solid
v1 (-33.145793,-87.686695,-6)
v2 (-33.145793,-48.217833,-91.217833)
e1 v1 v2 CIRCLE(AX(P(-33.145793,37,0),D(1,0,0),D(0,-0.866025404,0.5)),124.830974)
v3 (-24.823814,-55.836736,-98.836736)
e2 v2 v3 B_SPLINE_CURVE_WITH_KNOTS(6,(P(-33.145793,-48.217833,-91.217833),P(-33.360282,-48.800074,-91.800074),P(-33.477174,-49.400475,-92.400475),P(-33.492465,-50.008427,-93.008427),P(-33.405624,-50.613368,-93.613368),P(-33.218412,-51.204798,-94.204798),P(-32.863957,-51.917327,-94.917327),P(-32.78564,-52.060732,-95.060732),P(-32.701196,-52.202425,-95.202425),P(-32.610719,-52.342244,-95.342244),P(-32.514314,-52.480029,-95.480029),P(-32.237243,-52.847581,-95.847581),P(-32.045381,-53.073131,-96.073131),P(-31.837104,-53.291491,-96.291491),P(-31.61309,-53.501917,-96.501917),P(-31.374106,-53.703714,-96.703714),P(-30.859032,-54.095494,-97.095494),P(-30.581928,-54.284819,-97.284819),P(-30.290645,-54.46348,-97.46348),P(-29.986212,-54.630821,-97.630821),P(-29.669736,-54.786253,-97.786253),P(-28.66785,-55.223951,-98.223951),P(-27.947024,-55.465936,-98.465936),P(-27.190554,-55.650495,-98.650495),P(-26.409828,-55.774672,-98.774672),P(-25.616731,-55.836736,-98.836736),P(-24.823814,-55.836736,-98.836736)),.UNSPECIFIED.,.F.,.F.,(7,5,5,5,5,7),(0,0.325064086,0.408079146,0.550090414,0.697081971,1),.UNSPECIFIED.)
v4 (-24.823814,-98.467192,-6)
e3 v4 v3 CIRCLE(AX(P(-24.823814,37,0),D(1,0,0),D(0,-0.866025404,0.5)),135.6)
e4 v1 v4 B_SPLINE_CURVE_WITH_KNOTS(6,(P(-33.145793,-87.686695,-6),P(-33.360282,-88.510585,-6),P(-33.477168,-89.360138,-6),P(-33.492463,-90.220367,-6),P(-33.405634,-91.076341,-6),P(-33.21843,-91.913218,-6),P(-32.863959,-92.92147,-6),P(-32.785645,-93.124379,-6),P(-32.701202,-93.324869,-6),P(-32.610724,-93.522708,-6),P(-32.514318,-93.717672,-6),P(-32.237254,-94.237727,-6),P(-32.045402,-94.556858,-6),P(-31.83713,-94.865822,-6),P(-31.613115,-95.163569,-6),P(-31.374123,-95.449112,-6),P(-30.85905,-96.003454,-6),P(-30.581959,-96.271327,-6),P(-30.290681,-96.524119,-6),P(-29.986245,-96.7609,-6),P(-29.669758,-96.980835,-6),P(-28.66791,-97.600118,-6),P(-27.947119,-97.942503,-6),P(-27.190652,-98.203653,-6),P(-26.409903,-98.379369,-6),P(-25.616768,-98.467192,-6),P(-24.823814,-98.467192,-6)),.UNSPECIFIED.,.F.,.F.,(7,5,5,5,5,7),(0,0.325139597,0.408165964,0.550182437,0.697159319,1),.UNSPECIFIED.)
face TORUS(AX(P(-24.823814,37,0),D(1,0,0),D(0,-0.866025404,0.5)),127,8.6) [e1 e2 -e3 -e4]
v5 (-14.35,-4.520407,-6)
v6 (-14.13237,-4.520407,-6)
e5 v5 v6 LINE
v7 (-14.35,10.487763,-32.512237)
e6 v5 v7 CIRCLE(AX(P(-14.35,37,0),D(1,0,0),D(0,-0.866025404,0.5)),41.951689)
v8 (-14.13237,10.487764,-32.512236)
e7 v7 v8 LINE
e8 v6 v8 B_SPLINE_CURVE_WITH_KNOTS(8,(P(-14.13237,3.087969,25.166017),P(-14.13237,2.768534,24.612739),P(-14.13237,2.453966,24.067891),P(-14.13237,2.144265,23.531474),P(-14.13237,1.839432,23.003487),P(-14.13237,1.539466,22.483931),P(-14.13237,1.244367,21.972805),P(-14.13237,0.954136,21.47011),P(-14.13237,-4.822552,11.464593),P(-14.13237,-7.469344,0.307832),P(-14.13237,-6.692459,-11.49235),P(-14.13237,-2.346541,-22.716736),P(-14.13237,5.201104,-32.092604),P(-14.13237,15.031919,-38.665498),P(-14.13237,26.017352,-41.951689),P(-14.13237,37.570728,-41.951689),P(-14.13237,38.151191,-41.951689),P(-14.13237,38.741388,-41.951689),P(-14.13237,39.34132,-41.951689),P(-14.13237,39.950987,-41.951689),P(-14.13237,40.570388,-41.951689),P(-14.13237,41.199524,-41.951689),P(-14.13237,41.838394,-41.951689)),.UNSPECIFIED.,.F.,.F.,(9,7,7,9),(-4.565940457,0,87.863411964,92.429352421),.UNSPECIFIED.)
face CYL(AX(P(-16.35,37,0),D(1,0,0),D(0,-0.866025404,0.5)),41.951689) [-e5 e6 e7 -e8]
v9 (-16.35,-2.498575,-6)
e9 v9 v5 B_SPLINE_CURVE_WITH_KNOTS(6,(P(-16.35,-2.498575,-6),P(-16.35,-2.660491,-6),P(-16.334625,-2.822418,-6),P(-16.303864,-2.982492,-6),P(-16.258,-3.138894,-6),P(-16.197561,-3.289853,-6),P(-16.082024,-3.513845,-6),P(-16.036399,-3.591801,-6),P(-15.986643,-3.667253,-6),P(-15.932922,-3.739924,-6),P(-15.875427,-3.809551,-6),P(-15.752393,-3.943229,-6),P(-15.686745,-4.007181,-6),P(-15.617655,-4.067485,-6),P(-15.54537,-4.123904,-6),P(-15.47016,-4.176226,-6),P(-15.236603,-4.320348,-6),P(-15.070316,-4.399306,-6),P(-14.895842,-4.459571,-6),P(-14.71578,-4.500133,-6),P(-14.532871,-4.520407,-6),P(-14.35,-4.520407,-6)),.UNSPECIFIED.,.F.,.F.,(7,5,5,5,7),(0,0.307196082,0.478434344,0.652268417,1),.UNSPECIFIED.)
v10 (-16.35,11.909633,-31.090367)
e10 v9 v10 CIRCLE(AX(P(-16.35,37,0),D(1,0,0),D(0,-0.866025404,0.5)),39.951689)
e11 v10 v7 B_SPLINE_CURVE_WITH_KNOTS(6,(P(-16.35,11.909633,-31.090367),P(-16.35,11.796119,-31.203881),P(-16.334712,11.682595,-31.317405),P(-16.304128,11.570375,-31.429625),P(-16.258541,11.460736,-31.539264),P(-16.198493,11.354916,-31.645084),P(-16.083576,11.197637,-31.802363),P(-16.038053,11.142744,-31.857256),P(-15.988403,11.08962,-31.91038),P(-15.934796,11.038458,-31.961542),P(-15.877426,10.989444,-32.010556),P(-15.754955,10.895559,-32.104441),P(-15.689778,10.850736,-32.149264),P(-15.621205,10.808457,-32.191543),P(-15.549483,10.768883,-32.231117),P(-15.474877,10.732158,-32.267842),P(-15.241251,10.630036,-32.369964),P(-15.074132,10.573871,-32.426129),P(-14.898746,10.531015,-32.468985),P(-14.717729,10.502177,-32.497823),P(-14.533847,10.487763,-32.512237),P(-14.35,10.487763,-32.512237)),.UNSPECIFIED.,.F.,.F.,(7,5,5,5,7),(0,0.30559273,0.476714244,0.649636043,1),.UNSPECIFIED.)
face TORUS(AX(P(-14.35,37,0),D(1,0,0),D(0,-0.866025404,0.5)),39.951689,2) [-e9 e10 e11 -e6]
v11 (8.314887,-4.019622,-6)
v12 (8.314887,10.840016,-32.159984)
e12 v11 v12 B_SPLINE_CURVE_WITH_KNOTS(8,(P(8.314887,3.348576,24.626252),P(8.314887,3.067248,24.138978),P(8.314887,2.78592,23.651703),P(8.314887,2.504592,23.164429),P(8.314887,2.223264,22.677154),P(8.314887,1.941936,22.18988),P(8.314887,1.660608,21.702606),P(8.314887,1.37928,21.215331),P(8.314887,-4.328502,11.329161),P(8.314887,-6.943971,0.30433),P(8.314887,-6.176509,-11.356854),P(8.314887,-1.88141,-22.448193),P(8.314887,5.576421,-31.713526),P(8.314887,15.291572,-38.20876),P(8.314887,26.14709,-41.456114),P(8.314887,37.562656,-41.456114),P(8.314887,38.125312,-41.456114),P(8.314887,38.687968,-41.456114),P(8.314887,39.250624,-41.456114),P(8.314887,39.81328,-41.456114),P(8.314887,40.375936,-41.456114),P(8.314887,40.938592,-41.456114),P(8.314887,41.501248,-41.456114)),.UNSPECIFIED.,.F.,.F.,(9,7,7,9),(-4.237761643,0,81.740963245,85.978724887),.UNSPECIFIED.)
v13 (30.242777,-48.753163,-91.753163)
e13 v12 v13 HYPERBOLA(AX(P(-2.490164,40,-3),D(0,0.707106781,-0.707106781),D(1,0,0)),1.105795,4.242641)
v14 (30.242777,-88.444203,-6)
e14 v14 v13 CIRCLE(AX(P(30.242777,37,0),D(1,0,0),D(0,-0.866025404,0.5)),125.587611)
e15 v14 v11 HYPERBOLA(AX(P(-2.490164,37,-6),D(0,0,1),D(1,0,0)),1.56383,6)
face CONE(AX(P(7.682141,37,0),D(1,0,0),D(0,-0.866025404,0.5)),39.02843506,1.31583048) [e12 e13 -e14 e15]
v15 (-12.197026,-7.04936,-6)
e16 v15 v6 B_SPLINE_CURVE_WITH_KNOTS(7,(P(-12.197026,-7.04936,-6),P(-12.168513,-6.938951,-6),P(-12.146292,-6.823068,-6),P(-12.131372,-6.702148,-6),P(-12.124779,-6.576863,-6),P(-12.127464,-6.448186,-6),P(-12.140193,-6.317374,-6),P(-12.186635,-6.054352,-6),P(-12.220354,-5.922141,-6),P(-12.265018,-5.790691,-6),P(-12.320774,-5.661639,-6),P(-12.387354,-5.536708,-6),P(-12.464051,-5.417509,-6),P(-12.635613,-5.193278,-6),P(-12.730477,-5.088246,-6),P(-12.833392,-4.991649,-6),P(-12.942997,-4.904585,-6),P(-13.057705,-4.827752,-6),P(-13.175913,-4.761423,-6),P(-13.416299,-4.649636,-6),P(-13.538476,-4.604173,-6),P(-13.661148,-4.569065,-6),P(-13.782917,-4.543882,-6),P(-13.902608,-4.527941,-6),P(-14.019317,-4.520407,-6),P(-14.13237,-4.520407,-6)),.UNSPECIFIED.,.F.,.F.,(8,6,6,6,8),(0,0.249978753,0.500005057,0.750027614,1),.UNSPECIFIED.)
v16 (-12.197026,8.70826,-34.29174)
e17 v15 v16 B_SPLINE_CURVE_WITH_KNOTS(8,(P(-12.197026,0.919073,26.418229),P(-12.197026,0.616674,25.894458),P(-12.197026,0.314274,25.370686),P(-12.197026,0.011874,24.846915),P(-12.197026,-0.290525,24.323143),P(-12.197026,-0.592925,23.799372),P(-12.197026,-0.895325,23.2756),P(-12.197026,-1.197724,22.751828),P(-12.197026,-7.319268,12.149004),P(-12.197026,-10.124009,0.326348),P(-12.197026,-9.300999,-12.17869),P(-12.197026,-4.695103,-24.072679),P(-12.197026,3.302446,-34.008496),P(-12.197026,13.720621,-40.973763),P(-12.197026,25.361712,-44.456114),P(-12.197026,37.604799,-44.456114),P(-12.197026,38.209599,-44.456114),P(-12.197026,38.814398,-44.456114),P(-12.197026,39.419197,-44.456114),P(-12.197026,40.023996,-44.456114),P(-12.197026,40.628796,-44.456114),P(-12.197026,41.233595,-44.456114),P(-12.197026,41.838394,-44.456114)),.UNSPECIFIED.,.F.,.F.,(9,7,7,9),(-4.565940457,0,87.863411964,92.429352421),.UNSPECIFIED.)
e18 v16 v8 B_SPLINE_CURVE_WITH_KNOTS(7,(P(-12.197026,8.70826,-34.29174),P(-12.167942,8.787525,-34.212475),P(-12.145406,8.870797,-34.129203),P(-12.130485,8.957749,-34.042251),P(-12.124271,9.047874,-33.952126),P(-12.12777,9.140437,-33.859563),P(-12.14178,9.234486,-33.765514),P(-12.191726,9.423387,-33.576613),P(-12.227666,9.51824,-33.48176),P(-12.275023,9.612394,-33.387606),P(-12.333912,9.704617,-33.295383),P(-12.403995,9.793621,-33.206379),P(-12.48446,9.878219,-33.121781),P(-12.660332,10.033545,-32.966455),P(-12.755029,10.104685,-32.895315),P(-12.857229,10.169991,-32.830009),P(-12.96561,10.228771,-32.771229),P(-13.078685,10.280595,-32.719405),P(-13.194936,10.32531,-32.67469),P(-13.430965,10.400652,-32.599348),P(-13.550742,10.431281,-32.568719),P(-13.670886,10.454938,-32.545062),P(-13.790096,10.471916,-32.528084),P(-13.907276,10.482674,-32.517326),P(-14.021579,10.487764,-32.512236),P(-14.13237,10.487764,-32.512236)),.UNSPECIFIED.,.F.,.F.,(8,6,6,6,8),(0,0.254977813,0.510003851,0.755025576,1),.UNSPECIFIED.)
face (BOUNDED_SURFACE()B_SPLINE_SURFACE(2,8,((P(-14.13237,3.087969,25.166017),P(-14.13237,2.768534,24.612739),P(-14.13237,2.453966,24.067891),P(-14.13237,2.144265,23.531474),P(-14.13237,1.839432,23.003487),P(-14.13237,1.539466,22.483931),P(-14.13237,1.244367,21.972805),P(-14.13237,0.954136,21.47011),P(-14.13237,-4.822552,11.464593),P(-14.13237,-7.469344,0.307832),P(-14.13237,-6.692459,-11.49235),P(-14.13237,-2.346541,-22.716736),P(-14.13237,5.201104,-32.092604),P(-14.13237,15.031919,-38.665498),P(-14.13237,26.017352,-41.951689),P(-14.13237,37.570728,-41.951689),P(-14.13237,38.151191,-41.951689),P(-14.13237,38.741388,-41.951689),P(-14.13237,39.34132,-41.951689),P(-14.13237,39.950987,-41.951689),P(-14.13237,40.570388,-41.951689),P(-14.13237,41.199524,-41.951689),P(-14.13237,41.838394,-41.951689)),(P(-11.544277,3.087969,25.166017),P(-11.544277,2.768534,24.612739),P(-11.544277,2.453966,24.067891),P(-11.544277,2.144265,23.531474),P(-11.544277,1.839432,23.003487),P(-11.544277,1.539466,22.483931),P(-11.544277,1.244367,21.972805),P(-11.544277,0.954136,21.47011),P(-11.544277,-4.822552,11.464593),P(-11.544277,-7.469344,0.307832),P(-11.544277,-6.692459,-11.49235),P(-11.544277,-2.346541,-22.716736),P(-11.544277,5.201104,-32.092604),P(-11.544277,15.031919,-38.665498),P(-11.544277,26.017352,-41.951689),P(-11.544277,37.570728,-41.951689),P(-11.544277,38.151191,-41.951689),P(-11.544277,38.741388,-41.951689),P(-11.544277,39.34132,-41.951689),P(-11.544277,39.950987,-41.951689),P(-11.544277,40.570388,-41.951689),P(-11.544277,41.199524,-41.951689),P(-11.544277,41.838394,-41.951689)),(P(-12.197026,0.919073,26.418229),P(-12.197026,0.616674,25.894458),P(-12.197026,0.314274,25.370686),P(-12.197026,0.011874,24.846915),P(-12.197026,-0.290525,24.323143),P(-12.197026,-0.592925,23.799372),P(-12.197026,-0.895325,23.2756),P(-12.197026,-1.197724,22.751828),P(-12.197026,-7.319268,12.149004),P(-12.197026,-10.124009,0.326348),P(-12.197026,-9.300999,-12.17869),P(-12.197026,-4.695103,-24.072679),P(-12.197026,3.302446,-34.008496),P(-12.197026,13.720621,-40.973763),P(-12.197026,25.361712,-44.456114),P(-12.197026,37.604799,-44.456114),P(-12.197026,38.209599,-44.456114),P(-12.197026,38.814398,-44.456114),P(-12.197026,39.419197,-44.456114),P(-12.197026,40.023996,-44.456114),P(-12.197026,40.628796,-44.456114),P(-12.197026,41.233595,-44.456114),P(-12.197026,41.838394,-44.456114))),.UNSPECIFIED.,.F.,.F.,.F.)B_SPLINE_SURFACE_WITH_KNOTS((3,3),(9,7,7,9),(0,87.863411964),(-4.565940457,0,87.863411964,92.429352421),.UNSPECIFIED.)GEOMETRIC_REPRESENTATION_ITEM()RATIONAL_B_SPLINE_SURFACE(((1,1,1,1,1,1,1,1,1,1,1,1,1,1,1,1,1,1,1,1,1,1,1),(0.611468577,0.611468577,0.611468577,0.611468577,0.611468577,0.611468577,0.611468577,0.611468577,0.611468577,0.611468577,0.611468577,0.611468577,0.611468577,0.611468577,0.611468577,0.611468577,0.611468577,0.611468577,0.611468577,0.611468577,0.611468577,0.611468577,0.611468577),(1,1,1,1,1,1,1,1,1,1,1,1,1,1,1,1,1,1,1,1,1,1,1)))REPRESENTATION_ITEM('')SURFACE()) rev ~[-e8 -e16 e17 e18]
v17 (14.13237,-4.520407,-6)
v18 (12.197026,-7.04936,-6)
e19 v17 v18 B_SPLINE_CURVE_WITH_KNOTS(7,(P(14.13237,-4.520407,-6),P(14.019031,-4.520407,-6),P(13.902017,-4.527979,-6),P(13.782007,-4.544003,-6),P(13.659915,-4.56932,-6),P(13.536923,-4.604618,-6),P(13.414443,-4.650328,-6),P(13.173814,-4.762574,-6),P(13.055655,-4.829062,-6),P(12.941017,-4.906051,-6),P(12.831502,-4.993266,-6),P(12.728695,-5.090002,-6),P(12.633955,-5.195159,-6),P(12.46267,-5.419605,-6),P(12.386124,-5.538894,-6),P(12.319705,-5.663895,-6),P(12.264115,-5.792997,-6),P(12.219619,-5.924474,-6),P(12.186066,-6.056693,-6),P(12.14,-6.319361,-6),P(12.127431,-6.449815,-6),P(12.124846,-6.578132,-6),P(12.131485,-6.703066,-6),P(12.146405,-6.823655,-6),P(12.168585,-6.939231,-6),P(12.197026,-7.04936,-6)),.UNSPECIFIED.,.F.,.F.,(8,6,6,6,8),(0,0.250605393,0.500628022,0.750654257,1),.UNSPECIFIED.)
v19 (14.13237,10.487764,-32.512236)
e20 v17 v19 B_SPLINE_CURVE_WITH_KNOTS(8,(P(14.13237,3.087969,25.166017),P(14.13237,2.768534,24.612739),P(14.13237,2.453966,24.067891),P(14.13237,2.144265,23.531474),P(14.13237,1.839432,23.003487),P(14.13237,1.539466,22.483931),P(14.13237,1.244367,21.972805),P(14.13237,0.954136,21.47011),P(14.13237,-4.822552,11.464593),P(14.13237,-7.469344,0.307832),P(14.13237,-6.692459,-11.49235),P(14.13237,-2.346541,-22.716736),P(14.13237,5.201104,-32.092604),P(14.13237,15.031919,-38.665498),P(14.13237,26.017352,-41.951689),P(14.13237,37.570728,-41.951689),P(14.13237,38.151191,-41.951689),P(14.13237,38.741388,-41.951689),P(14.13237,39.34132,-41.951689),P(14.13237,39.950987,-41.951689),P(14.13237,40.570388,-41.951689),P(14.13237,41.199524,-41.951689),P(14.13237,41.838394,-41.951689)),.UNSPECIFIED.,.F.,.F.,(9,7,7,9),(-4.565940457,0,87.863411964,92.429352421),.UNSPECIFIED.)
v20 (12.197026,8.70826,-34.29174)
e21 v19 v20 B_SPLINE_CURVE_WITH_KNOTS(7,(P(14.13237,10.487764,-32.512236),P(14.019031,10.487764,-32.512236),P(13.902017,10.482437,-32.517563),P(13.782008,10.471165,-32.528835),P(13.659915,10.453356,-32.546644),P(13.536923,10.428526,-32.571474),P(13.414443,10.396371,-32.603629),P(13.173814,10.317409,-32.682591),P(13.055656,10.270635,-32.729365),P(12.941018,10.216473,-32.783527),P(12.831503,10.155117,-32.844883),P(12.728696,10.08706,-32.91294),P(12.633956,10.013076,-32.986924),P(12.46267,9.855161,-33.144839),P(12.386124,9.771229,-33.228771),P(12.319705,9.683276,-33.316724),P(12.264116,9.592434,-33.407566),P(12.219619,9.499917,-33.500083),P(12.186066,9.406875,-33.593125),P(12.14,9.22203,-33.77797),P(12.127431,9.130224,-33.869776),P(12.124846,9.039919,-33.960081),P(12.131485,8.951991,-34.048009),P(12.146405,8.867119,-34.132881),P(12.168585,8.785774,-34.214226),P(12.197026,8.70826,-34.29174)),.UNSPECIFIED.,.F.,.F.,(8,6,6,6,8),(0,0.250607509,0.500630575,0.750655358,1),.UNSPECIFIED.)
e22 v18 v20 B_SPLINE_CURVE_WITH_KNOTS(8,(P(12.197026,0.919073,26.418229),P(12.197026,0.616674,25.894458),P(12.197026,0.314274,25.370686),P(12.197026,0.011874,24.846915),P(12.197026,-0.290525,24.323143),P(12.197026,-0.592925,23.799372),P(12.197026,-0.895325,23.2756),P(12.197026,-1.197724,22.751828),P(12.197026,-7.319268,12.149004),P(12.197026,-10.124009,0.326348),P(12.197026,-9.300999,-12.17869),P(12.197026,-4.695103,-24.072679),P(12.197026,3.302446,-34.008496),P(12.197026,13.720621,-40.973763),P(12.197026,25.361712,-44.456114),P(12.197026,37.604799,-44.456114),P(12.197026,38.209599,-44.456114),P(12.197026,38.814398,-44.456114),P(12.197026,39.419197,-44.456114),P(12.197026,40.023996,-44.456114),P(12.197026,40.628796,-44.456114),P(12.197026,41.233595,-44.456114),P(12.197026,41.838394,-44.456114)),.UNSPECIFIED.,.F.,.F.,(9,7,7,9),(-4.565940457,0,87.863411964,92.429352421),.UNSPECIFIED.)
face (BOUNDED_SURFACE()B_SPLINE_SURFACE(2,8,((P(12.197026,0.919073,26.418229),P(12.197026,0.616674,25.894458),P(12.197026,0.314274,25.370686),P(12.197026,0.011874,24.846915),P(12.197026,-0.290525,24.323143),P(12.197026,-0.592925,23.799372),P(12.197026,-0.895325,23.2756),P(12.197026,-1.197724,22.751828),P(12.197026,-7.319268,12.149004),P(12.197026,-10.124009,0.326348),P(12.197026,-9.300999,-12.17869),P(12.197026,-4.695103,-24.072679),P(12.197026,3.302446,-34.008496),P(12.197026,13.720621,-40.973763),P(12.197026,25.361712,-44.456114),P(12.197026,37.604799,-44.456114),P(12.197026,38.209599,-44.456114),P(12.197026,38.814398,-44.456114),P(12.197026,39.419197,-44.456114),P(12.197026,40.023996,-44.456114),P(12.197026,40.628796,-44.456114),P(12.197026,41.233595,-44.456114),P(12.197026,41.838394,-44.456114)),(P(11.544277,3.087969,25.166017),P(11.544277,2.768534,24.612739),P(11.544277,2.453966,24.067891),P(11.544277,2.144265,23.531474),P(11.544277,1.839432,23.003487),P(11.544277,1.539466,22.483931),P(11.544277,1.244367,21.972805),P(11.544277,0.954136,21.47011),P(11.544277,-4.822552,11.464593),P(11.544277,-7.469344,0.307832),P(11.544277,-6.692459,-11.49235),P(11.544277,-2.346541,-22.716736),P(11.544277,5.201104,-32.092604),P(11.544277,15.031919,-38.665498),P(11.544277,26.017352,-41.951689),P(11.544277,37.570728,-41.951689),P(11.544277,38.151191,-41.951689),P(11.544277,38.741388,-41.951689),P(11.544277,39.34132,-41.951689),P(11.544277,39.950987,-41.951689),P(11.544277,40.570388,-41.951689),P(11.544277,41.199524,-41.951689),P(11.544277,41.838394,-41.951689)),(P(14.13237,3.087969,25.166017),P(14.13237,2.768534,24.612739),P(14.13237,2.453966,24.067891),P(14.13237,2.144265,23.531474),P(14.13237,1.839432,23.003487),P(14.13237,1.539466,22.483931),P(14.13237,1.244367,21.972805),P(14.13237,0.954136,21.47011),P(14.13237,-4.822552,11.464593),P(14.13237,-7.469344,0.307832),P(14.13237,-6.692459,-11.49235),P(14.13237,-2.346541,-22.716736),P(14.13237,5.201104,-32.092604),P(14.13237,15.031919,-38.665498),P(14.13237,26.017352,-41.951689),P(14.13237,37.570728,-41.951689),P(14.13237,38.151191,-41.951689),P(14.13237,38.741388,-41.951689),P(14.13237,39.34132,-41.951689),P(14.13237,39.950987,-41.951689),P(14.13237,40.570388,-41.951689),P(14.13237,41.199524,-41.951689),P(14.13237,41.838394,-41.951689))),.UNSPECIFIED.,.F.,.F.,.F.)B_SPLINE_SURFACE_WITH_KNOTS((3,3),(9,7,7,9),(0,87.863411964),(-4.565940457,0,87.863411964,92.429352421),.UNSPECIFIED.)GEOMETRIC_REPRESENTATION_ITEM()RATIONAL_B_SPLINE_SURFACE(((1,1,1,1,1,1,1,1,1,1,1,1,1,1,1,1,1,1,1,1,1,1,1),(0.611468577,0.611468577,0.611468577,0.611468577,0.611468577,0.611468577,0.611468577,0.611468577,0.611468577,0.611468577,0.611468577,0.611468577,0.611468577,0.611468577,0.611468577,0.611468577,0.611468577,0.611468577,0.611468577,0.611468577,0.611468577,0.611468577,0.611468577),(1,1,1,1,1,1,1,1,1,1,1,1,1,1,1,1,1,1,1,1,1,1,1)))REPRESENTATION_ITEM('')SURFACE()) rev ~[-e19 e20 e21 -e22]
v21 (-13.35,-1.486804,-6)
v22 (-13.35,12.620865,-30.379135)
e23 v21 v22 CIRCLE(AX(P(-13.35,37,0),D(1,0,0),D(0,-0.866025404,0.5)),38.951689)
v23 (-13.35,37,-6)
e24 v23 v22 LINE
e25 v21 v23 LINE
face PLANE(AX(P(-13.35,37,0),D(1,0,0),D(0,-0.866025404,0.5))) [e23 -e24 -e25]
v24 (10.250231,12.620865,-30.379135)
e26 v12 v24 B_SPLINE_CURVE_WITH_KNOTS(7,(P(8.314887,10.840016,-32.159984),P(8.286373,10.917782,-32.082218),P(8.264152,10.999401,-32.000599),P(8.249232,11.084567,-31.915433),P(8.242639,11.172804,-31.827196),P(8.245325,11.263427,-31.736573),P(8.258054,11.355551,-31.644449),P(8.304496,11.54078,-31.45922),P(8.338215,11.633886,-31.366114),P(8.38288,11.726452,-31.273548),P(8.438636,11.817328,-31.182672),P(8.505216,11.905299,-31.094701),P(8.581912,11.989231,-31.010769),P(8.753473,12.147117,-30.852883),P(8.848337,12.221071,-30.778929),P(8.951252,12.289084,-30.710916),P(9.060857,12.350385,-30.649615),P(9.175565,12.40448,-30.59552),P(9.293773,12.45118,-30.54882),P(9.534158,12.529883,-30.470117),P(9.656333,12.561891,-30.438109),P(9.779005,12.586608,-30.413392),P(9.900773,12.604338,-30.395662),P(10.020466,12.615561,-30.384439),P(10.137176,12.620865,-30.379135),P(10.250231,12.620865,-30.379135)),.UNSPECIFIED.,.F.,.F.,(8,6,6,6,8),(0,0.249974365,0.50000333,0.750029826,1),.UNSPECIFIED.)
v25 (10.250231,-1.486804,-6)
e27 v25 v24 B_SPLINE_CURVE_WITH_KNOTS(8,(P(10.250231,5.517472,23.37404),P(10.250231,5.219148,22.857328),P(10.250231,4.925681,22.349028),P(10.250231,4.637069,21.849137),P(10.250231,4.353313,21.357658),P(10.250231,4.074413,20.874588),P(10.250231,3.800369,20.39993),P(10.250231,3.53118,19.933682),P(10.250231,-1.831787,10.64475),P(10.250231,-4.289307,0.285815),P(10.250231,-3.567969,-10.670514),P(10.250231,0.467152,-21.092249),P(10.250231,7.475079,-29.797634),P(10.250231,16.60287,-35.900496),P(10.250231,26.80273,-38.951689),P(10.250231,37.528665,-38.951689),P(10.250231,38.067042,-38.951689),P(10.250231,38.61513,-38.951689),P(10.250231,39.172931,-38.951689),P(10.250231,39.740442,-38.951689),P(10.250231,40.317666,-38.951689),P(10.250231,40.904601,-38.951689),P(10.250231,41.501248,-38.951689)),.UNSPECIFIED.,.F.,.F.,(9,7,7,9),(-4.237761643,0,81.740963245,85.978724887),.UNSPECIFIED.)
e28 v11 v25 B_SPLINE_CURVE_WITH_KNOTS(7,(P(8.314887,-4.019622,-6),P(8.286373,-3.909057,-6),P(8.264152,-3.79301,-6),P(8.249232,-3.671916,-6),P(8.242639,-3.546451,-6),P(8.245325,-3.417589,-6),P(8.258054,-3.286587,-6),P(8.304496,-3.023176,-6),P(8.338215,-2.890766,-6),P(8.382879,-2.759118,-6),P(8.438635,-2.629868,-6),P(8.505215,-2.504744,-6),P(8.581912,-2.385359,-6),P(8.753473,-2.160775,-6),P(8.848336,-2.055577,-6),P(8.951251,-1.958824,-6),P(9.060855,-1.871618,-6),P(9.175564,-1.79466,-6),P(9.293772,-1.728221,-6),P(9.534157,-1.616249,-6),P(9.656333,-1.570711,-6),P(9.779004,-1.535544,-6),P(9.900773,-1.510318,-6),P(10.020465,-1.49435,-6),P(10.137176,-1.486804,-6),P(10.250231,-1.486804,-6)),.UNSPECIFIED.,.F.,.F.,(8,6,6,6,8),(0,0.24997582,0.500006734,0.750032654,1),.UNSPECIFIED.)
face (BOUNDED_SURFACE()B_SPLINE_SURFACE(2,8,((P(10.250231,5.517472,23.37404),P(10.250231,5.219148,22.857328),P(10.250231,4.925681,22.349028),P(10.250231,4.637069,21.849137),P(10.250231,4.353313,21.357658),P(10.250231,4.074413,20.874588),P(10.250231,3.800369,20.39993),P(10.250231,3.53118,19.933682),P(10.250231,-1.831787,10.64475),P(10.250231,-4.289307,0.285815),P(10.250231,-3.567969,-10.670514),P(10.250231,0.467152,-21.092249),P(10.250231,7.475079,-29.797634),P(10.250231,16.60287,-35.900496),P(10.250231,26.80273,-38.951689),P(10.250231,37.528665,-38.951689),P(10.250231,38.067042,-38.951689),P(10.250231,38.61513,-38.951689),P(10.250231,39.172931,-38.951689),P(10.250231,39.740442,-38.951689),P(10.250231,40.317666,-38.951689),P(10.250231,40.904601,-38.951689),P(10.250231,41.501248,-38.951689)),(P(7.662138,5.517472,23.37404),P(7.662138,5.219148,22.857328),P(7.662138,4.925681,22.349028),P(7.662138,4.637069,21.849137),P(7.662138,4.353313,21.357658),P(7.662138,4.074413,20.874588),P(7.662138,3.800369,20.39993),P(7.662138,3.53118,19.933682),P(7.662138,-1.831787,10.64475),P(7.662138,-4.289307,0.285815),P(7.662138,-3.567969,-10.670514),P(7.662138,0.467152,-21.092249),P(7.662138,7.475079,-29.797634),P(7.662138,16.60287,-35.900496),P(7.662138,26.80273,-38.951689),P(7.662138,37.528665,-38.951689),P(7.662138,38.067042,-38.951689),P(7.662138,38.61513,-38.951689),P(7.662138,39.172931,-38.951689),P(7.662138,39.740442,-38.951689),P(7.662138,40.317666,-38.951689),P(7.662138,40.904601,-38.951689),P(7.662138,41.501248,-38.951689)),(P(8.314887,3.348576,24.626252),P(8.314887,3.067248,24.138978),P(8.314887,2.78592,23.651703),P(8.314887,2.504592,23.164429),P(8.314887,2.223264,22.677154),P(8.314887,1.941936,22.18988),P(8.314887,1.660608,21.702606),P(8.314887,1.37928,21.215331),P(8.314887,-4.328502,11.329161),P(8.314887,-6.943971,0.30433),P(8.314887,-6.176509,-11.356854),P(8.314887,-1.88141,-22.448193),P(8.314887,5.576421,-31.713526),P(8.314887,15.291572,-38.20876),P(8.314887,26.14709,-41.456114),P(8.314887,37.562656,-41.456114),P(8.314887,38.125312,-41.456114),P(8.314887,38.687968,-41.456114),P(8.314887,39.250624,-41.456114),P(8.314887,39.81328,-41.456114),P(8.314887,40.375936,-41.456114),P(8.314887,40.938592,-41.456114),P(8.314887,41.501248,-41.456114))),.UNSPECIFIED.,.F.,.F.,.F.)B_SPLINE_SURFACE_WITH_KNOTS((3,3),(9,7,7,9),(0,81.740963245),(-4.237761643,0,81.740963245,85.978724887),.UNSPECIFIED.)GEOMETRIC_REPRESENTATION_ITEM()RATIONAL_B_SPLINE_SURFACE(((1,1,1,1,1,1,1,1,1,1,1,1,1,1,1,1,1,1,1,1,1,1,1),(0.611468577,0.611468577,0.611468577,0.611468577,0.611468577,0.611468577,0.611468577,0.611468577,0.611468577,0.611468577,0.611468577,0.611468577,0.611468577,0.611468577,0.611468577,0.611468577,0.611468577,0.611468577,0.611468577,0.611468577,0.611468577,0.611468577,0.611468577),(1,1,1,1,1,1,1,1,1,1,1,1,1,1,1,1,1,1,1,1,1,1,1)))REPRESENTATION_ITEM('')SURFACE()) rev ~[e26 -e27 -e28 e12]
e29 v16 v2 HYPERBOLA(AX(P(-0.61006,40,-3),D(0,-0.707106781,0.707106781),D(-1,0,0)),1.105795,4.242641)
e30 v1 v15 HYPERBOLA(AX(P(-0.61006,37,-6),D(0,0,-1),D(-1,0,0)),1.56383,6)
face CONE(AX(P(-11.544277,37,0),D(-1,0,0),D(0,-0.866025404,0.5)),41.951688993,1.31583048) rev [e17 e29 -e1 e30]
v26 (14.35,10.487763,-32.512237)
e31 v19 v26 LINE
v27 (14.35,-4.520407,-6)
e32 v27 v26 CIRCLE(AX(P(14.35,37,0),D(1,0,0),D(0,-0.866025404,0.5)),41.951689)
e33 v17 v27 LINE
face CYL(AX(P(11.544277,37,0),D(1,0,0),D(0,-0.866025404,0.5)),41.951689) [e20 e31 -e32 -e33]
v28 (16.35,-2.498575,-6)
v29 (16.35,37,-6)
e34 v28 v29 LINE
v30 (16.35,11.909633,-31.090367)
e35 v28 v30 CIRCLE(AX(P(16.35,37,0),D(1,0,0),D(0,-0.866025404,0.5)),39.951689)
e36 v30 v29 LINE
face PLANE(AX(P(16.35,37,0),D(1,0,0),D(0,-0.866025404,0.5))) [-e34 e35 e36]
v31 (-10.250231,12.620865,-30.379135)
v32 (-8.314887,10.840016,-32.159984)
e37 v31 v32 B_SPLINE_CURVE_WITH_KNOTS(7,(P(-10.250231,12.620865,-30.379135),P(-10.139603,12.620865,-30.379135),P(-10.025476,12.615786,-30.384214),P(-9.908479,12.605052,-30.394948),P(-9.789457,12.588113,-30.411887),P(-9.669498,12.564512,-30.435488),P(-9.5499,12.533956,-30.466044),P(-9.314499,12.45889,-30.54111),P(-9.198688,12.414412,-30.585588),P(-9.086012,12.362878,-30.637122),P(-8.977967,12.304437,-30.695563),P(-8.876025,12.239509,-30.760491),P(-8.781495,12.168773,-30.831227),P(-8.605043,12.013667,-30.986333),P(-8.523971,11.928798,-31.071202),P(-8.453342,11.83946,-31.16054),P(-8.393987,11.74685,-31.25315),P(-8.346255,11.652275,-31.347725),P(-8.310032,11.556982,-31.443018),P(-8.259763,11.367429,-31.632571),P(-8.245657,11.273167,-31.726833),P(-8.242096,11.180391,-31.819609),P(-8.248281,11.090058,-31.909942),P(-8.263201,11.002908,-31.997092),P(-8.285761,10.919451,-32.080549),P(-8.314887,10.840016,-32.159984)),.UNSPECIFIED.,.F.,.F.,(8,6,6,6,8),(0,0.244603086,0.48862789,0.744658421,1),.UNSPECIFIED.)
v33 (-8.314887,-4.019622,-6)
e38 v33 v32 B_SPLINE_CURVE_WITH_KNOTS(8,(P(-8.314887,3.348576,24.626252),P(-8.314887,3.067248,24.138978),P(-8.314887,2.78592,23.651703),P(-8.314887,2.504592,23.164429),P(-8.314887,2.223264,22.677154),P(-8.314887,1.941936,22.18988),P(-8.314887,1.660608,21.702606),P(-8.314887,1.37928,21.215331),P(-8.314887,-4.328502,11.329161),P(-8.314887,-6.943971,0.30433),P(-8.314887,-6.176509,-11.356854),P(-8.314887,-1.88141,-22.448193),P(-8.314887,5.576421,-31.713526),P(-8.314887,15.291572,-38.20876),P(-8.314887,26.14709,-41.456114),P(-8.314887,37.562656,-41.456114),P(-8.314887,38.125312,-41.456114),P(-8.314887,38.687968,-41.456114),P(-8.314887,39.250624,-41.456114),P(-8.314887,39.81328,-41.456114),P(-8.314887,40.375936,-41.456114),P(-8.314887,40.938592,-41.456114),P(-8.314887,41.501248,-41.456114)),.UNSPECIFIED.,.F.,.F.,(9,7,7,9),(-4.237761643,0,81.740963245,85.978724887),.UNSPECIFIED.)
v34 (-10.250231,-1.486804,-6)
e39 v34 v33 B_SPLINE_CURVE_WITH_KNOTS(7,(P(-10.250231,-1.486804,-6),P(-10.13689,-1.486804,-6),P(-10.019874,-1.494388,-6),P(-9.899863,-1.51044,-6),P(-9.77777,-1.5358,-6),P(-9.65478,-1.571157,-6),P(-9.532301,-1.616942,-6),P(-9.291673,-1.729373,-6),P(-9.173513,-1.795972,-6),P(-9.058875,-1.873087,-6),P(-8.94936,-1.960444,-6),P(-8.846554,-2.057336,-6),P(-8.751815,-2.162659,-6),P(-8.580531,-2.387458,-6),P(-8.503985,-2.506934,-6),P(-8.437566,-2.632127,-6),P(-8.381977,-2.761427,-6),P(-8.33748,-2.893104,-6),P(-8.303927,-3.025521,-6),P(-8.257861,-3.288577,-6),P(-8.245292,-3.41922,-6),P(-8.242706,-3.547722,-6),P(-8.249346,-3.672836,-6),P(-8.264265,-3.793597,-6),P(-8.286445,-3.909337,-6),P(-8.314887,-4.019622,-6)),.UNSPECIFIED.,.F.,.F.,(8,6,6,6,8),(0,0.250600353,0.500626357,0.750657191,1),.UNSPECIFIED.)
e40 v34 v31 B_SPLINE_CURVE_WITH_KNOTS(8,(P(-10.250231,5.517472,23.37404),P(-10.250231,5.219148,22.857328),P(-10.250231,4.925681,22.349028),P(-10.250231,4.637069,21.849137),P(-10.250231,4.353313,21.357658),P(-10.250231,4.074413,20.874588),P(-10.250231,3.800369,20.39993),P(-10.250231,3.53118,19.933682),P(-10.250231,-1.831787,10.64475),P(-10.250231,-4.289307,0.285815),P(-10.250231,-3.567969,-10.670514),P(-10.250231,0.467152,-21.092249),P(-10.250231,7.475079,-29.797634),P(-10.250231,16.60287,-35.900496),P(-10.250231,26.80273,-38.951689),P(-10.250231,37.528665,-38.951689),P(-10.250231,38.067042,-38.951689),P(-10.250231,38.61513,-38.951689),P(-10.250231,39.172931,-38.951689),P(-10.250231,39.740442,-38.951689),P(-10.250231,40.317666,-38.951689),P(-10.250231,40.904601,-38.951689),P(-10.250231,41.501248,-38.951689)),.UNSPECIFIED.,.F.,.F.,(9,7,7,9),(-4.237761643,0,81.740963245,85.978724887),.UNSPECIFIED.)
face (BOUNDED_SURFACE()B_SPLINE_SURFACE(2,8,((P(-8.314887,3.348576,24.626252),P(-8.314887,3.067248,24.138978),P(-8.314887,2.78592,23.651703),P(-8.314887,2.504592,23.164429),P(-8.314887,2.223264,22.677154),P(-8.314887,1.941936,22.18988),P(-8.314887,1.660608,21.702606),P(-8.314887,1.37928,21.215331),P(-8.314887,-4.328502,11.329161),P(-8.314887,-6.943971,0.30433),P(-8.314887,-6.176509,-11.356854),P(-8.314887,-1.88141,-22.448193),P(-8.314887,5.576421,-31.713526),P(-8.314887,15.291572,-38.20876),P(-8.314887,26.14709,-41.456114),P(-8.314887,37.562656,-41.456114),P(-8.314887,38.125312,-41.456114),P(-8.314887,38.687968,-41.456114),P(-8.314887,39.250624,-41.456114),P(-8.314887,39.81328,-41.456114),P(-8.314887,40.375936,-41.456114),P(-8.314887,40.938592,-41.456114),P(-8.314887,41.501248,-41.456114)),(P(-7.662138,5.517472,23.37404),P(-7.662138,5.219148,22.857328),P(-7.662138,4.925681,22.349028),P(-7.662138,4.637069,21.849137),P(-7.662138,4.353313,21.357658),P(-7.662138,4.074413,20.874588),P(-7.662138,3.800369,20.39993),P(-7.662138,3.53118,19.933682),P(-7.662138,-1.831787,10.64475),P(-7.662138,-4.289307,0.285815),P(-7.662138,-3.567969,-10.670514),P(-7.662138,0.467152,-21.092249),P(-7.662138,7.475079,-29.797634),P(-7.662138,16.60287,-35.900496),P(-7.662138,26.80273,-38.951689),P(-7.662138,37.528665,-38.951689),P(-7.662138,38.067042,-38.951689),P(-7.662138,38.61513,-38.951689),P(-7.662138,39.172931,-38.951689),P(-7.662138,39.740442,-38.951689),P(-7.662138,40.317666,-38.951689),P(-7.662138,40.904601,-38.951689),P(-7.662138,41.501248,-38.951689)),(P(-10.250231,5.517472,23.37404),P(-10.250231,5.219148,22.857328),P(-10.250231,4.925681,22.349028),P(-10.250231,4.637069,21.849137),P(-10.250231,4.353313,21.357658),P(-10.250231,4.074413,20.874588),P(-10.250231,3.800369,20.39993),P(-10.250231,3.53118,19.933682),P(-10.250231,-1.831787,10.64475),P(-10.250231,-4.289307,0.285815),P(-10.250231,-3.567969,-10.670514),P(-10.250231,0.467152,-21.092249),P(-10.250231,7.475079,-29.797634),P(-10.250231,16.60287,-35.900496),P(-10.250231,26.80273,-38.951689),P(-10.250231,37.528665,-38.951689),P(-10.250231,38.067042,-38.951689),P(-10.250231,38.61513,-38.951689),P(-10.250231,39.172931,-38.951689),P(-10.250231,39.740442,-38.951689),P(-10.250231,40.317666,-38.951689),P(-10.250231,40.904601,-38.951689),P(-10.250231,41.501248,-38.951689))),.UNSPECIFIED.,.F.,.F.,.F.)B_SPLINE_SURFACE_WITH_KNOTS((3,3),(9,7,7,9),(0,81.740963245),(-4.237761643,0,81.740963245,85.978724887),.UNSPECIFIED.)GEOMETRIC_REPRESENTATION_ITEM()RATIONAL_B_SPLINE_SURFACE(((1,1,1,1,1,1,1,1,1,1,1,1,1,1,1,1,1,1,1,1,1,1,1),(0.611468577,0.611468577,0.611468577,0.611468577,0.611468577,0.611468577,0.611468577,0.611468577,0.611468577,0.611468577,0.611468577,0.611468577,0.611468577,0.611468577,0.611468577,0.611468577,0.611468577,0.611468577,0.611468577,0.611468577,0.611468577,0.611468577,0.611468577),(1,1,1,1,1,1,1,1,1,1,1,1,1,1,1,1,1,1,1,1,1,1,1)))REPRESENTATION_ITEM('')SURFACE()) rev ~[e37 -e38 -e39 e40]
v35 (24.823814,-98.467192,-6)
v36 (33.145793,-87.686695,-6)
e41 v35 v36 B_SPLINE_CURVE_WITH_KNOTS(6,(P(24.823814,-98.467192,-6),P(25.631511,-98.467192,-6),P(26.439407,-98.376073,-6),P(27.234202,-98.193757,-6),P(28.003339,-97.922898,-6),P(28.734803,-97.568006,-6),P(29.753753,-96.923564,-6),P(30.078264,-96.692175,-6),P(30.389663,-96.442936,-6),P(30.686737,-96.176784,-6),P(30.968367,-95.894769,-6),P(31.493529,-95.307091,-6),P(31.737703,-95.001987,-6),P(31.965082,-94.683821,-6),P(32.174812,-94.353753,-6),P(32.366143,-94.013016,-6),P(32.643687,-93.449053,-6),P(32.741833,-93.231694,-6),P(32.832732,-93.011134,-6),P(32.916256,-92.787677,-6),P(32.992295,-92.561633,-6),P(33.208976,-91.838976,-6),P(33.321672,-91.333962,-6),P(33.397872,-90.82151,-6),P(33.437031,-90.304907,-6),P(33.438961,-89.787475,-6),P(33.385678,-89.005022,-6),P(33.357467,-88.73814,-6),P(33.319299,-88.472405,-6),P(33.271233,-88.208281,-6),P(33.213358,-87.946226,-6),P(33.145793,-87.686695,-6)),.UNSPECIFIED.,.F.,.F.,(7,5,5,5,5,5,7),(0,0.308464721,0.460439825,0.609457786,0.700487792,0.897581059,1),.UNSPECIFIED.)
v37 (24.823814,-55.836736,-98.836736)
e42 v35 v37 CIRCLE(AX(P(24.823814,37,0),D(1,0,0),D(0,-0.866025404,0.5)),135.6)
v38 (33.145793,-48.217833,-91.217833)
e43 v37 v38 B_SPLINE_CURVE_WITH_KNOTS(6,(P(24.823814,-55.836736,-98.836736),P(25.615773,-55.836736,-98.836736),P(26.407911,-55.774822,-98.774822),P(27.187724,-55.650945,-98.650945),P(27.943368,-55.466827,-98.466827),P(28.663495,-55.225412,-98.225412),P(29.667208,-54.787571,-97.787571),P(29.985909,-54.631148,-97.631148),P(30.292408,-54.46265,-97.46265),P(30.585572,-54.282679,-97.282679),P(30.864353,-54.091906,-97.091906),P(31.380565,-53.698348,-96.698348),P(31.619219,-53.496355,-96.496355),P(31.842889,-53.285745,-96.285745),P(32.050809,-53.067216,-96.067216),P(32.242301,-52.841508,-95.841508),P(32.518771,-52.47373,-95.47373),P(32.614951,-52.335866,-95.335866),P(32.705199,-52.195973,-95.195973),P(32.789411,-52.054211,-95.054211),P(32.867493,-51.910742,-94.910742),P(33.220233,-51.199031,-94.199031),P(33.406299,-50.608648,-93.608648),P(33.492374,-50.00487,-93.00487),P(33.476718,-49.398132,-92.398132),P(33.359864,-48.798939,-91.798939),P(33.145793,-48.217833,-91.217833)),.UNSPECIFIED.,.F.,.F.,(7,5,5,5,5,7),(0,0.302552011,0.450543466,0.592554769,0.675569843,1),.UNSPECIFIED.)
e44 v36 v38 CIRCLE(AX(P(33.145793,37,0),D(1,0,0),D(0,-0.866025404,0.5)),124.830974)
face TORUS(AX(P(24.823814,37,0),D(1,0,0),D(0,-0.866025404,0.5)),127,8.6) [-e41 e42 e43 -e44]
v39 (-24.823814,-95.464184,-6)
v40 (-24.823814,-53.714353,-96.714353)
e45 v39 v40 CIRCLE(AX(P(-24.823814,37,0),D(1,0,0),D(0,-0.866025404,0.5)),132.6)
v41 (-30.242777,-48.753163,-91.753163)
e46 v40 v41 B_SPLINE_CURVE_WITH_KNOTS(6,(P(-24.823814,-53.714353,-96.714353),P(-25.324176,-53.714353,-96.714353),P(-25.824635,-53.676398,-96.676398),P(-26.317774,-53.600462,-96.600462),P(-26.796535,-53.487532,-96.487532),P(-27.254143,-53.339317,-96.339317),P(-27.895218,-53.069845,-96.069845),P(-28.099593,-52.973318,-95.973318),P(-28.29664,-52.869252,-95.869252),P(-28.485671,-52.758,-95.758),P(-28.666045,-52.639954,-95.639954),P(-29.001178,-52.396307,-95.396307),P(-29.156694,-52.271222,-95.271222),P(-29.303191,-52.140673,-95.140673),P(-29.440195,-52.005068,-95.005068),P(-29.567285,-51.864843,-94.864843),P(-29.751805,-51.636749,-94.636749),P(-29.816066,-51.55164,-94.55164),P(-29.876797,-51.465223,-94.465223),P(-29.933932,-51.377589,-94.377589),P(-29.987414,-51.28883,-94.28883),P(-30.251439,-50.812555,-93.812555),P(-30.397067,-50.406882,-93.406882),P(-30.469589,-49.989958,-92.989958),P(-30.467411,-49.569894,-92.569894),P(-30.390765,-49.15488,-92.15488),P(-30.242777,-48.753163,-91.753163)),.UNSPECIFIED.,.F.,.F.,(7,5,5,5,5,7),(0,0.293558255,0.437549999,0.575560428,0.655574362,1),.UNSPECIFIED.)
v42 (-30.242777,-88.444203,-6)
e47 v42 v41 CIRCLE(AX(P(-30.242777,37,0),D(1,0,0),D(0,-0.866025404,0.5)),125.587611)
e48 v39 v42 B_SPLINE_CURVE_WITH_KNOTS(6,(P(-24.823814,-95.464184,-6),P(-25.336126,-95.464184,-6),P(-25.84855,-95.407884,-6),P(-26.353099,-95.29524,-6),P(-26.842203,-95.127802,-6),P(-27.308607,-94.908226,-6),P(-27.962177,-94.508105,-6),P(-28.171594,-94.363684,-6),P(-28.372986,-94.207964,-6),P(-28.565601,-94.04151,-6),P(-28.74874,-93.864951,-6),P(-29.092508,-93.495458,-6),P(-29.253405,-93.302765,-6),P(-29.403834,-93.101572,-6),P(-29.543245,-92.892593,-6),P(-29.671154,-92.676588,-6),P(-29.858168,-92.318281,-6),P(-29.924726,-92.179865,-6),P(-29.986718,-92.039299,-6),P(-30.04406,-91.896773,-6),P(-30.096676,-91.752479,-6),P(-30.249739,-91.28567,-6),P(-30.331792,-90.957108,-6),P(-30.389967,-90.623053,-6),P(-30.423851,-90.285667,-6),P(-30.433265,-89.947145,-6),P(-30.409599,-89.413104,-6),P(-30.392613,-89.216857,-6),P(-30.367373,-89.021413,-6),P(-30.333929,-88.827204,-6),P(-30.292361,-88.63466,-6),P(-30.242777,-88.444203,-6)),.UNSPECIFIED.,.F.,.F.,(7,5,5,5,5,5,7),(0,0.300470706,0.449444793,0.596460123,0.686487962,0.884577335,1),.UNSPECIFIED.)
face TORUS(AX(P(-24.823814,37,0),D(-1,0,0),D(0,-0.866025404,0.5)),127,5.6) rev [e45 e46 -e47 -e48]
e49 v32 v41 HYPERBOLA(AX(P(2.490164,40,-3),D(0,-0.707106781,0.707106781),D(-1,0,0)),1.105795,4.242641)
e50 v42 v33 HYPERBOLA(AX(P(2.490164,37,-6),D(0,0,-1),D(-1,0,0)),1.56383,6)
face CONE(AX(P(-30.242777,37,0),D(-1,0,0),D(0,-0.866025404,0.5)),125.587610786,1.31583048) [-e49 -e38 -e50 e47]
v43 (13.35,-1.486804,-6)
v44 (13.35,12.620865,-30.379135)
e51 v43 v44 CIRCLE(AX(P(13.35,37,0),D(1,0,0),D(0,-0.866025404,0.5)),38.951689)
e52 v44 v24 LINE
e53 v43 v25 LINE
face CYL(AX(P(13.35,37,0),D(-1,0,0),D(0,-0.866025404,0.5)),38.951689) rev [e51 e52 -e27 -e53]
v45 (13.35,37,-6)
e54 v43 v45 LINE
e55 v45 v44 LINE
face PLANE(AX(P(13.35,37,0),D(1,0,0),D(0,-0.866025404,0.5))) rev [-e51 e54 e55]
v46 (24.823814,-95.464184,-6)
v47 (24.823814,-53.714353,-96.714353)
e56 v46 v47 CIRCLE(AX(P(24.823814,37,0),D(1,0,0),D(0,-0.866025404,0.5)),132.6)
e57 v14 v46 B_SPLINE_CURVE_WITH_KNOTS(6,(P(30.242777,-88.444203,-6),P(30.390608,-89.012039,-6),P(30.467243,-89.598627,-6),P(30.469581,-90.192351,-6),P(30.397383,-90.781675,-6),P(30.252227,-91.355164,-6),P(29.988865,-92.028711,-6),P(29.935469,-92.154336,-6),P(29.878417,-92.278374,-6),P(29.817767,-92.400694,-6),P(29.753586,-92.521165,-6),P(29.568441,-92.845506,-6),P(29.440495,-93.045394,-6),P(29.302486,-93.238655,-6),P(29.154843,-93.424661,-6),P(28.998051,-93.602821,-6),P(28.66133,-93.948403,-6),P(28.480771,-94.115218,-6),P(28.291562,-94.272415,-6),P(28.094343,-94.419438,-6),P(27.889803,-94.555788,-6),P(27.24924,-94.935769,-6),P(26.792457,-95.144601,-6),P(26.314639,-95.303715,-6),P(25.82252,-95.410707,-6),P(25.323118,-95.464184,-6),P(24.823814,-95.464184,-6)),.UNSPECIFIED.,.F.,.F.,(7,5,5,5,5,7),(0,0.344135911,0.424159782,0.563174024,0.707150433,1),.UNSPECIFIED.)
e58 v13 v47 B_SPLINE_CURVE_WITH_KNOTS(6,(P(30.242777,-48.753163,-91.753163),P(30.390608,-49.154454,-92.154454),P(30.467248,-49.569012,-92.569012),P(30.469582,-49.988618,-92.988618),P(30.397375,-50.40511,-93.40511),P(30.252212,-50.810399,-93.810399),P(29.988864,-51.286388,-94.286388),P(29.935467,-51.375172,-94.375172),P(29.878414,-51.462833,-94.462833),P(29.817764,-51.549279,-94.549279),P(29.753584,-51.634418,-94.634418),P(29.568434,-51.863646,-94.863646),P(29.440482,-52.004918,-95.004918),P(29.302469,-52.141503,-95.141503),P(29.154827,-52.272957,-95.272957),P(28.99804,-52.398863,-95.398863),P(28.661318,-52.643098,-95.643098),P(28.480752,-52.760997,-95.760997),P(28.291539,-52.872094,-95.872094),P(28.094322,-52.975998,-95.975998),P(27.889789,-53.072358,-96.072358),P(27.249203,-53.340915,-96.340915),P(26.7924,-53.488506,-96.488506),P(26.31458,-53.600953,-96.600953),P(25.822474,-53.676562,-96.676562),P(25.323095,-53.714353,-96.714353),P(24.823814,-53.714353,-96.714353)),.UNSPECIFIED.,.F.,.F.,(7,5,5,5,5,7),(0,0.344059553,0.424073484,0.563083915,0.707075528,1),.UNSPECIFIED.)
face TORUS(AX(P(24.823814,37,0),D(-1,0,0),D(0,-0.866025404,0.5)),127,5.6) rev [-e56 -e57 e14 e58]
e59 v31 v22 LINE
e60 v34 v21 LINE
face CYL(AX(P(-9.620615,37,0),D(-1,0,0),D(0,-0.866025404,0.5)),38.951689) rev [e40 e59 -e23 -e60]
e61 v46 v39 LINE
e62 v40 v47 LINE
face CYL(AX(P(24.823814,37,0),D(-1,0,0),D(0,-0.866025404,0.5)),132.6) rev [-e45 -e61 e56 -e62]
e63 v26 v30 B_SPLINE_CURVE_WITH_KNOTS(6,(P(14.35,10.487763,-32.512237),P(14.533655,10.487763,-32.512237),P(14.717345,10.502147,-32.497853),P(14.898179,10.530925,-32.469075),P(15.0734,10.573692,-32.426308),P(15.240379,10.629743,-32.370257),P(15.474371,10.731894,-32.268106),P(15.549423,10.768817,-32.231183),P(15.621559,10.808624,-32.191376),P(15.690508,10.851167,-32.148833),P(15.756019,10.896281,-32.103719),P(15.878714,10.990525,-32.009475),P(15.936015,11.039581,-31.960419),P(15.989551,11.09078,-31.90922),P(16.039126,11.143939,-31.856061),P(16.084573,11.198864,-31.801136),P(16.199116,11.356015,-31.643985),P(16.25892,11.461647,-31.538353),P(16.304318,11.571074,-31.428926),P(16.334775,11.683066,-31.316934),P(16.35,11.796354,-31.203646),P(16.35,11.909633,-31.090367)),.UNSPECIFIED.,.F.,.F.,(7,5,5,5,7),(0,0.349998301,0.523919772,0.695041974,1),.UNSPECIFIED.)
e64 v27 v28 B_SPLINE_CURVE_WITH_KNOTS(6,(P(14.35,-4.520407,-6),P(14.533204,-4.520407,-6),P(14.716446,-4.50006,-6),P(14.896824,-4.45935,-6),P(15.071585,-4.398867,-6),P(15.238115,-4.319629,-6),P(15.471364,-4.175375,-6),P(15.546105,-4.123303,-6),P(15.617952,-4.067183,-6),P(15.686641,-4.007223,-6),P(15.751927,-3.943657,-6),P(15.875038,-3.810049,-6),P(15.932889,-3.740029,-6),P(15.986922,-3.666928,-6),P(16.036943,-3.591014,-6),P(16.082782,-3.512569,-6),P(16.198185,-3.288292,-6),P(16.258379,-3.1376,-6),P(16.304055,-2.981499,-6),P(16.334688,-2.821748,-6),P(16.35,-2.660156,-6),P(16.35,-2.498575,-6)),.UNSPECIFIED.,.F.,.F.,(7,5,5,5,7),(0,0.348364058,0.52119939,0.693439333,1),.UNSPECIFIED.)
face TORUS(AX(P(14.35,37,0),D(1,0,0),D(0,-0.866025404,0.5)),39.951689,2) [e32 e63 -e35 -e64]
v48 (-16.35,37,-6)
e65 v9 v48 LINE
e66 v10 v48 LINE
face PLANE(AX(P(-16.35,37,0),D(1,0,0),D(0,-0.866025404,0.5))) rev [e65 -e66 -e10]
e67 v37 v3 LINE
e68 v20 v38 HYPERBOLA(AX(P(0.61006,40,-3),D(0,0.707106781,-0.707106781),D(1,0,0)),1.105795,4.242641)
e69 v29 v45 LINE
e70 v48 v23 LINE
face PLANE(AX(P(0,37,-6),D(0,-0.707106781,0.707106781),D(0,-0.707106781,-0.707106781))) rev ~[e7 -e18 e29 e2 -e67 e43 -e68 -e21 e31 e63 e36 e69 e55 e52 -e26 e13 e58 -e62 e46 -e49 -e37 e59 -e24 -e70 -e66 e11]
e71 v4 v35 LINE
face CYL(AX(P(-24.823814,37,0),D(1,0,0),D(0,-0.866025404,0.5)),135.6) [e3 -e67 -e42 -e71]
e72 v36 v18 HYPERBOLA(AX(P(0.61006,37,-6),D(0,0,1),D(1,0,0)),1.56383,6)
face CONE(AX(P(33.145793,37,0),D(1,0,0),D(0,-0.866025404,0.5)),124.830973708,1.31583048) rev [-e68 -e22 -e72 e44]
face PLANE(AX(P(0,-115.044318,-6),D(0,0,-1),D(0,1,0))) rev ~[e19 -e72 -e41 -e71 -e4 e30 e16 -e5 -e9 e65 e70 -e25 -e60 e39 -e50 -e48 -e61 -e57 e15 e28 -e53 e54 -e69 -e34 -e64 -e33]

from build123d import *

# Parameters (mm, degrees)
F1_ANGLE_BACK  = 30
F1_ANGLE       = 120
F2_R           = 2
F4_DEPTH       = 25
F4_DEPTH_BACK  = 25
F5_DEPTH       = 25
F5_DEPTH_BACK  = 25
F8_R           = 5
F10_DEPTH      = 33.4248144675
F10_DEPTH_BACK = 33.4248144675
F12_DEPTH      = 50
F12_DEPTH_BACK = 50


# Not quite as in the source:
# - after a boolean that leaves OpenCascade's solid faulty, fix() repairs it
# - a feature of the source that left no trace in its solid (it failed there, or was rolled back) is left out


with BuildPart() as f1:
    # F0 (on Top) → F1 (revolve)
    with BuildSketch(Plane.XY, mode=Mode.PRIVATE) as f1_sk:
        with BuildLine():
            Line((9.6206148389, -1.9516889929), (7.6821408379, -2.0284350604))
            Line((7.6821408379, -2.0284350604), (30.2427770644, -88.5876107865))
            ThreePointArc((30.2427770644, -88.5876107865), (29.2549191731, -93.4242240292), (24.8238143675, -95.6))
            Line((24.8238143675, -95.6), (-24.8238143675, -95.6))
            ThreePointArc((-24.8238143675, -95.6), (-29.2549191731, -93.4242240292), (-30.2427770644, -88.5876107865))
            Line((-30.2427770644, -88.5876107865), (-7.6821408379, -2.0284350604))
            Line((-7.6821408379, -2.0284350604), (-9.6206148389, -1.9516889929))
            Line((-9.6206148389, -1.9516889929), (-13.35, -1.9516889929))
            Line((-13.35, -1.9516889929), (-13.35, 37))
            Line((-13.35, 37), (-16.35, 37))
            Line((-16.35, 37), (-16.35, -4.9516889929))
            Line((-16.35, -4.9516889929), (-11.5442770978, -4.9516889929))
            Line((-11.5442770978, -4.9516889929), (-33.1457927948, -87.8309737078))
            ThreePointArc((-33.1457927948, -87.8309737078), (-31.6287253189, -95.2586297591), (-24.8238143675, -98.6))
            Line((-24.8238143675, -98.6), (24.8238143675, -98.6))
            ThreePointArc((24.8238143675, -98.6), (31.6287253189, -95.2586297591), (33.1457927948, -87.8309737078))
            Line((33.1457927948, -87.8309737078), (11.5442770978, -4.9516889929))
            Line((11.5442770978, -4.9516889929), (16.35, -4.9516889929))
            Line((16.35, -4.9516889929), (16.35, 37))
            Line((16.35, 37), (13.35, 37))
            Line((13.35, 37), (13.35, -1.9516889929))
            Line((13.35, -1.9516889929), (9.6206148389, -1.9516889929))
        make_face()
    revolve(f1_sk.sketch.rotate(Axis((0.7210588083, 37, 0), (1, 0, 0)), -F1_ANGLE_BACK), axis=Axis((0.7210588083, 37, 0), (1, 0, 0)), revolution_arc=F1_ANGLE)

    # F2
    f2_edges = [f1.edges().sort_by_distance(p)[0] for p in [
        (7.682141, 3.200384, -19.514218),
        (11.544277, 0.668772, -20.975844),
        (16.35, 0.668772, -20.975844),
        (-7.682141, 3.200384, -19.514218),
        (-16.35, 0.668772, -20.975844),
        (-11.544277, 0.668772, -20.975844),
    ]]
    fillet(f2_edges, radius=F2_R)

    # F3 (on Right) → F4 (join, two sides)
    with BuildSketch(Plane.YZ) as f4_sk:
        with BuildLine():
            Line((51.55, 6), (26.6076951546, 6))
            Line((26.6076951546, 6), (34.6184301396, 1.375))
            ThreePointArc((34.6184301396, 1.375), (37.711752374, 2.6562960223), (39.75, 0))
            ThreePointArc((39.75, 0), (38.9445436483, -1.9445436483), (37, -2.75))
            Line((37, -2.75), (37, -6))
            Line((37, -6), (51.55, -6))
            Line((51.55, -6), (51.55, 6))
        make_face()
        with BuildLine():
            ThreePointArc((47.3738633754, 0.95), (47.505593785, 0.4830952573), (47.55, 0))
            ThreePointArc((47.55, 0), (47.505593785, -0.4830952573), (47.3738633754, -0.95))
            ThreePointArc((47.3738633754, -0.95), (46.7738329701, -1.8738329701), (45.85, -2.4738633754))
            ThreePointArc((45.85, -2.4738633754), (44.9, -2.65), (43.95, -2.4738633754))
            ThreePointArc((43.95, -2.4738633754), (43.0261670299, -1.8738329701), (42.4261366246, -0.95))
            ThreePointArc((42.4261366246, -0.95), (42.25, 0), (42.4261366246, 0.95))
            ThreePointArc((42.4261366246, 0.95), (43.0261670299, 1.8738329701), (43.95, 2.4738633754))
            ThreePointArc((43.95, 2.4738633754), (44.9, 2.65), (45.85, 2.4738633754))
            ThreePointArc((45.85, 2.4738633754), (46.7738329701, 1.8738329701), (47.3738633754, 0.95))
        make_face(mode=Mode.SUBTRACT)
        with BuildLine():
            Line((34.6184301396, 1.375), (26.6076951546, 6))
            Line((26.6076951546, 6), (22.45, 6))
            Line((22.45, 6), (22.45, -6))
            Line((22.45, -6), (37, -6))
            Line((37, -6), (37, -2.75))
            ThreePointArc((37, -2.75), (34.6184301396, -1.375), (34.6184301396, 1.375))
        make_face()
        with BuildLine():
            ThreePointArc((31.5738633754, 0.95), (31.705593785, 0.4830952573), (31.75, 0))
            ThreePointArc((31.75, 0), (31.705593785, -0.4830952573), (31.5738633754, -0.95))
            ThreePointArc((31.5738633754, -0.95), (30.9738329701, -1.8738329701), (30.05, -2.4738633754))
            ThreePointArc((30.05, -2.4738633754), (29.1, -2.65), (28.15, -2.4738633754))
            ThreePointArc((28.15, -2.4738633754), (27.2261670299, -1.8738329701), (26.6261366246, -0.95))
            ThreePointArc((26.6261366246, -0.95), (26.45, 0), (26.6261366246, 0.95))
            ThreePointArc((26.6261366246, 0.95), (27.2261670299, 1.8738329701), (28.15, 2.4738633754))
            ThreePointArc((28.15, 2.4738633754), (29.1, 2.65), (30.05, 2.4738633754))
            ThreePointArc((30.05, 2.4738633754), (30.9738329701, 1.8738329701), (31.5738633754, 0.95))
        make_face(mode=Mode.SUBTRACT)
        with BuildLine():
            Line((43.95, 0.95), (43.95, 2.4738633754))
            ThreePointArc((43.95, 2.4738633754), (43.0261670299, 1.8738329701), (42.4261366246, 0.95))
            Line((42.4261366246, 0.95), (43.95, 0.95))
        make_face()
        with BuildLine():
            Line((45.85, 0.95), (47.3738633754, 0.95))
            ThreePointArc((47.3738633754, 0.95), (46.7738329701, 1.8738329701), (45.85, 2.4738633754))
            Line((45.85, 2.4738633754), (45.85, 0.95))
        make_face()
        with BuildLine():
            ThreePointArc((45.85, -2.4738633754), (46.7738329701, -1.8738329701), (47.3738633754, -0.95))
            Line((47.3738633754, -0.95), (45.85, -0.95))
            Line((45.85, -0.95), (45.85, -2.4738633754))
        make_face()
        with BuildLine():
            ThreePointArc((42.4261366246, -0.95), (43.0261670299, -1.8738329701), (43.95, -2.4738633754))
            Line((43.95, -2.4738633754), (43.95, -0.95))
            Line((43.95, -0.95), (42.4261366246, -0.95))
        make_face()
        with BuildLine():
            Line((30.05, 0.95), (31.5738633754, 0.95))
            ThreePointArc((31.5738633754, 0.95), (30.9738329701, 1.8738329701), (30.05, 2.4738633754))
            Line((30.05, 2.4738633754), (30.05, 0.95))
        make_face()
        with BuildLine():
            Line((28.15, 0.95), (28.15, 2.4738633754))
            ThreePointArc((28.15, 2.4738633754), (27.2261670299, 1.8738329701), (26.6261366246, 0.95))
            Line((26.6261366246, 0.95), (28.15, 0.95))
        make_face()
        with BuildLine():
            ThreePointArc((26.6261366246, -0.95), (27.2261670299, -1.8738329701), (28.15, -2.4738633754))
            Line((28.15, -2.4738633754), (28.15, -0.95))
            Line((28.15, -0.95), (26.6261366246, -0.95))
        make_face()
        with BuildLine():
            ThreePointArc((30.05, -2.4738633754), (30.9738329701, -1.8738329701), (31.5738633754, -0.95))
            Line((31.5738633754, -0.95), (30.05, -0.95))
            Line((30.05, -0.95), (30.05, -2.4738633754))
        make_face()
    extrude(amount=F4_DEPTH)
    extrude(f4_sk.sketch, amount=-F4_DEPTH_BACK)

    # F3 (on Right) → F5 (cut, two sides)
    with BuildSketch(Plane.YZ) as f5_sk:
        with BuildLine():
            Line((37, 0), (34.6184301396, 1.375))
            ThreePointArc((34.6184301396, 1.375), (34.6184301396, -1.375), (37, -2.75))
            Line((37, -2.75), (37, 0))
        make_face()
        with BuildLine():
            ThreePointArc((31.5738633754, -0.95), (31.705593785, -0.4830952573), (31.75, 0))
            ThreePointArc((31.75, 0), (31.705593785, 0.4830952573), (31.5738633754, 0.95))
            Line((31.5738633754, 0.95), (30.05, 0.95))
            Line((30.05, 0.95), (30.05, 2.4738633754))
            ThreePointArc((30.05, 2.4738633754), (29.1, 2.65), (28.15, 2.4738633754))
            Line((28.15, 2.4738633754), (28.15, 0.95))
            Line((28.15, 0.95), (26.6261366246, 0.95))
            ThreePointArc((26.6261366246, 0.95), (26.45, 0), (26.6261366246, -0.95))
            Line((26.6261366246, -0.95), (28.15, -0.95))
            Line((28.15, -0.95), (28.15, -2.4738633754))
            ThreePointArc((28.15, -2.4738633754), (29.1, -2.65), (30.05, -2.4738633754))
            Line((30.05, -2.4738633754), (30.05, -0.95))
            Line((30.05, -0.95), (31.5738633754, -0.95))
        make_face()
    extrude(amount=-F5_DEPTH, mode=Mode.SUBTRACT)
    extrude(f5_sk.sketch, amount=F5_DEPTH_BACK, mode=Mode.SUBTRACT)

    add(f1.part.fix(), mode=Mode.REPLACE)

    # F8
    f8_edges = [f1.edges().sort_by_distance(p)[0] for p in [
        (-20.675, 22.45, -6),
        (-20.675, 22.45, 6),
        (0, 51.55, 6),
        (0, 51.55, -6),
    ]]
    fillet(f8_edges, radius=F8_R)

    # F9 (on Right) → F10 (cut, two sides)
    with BuildSketch(Plane.YZ) as f10_sk:
        Polygon((-115.0443181396, -6), (27.45, -6), (46.55, -6), (89.7687226534, -48.6618503928), (83.2566171885, 31.4302965999), (-50.0242002308, 71.4145377278), (-90.0084450841, 71.4145377278), align=None)
    extrude(amount=F10_DEPTH, mode=Mode.SUBTRACT)
    extrude(f10_sk.sketch, amount=-F10_DEPTH_BACK, mode=Mode.SUBTRACT)

    # F11 (on Right) → F12 (cut, two sides)
    with BuildSketch(Plane.YZ) as f12_sk:
        Polygon((57.0278279483, 8.6879674345), (37, -6), (-77.3825557827, -120.3825557827), (-35.5902947485, -136.9153559208), (64.6576955914, -143.4855163097), (76.9502595067, -111.2705171108), (76.9502595067, -24.7986763716), align=None)
    extrude(amount=-F12_DEPTH, mode=Mode.SUBTRACT)
    extrude(f12_sk.sketch, amount=F12_DEPTH_BACK, mode=Mode.SUBTRACT)


solid = f1.part
